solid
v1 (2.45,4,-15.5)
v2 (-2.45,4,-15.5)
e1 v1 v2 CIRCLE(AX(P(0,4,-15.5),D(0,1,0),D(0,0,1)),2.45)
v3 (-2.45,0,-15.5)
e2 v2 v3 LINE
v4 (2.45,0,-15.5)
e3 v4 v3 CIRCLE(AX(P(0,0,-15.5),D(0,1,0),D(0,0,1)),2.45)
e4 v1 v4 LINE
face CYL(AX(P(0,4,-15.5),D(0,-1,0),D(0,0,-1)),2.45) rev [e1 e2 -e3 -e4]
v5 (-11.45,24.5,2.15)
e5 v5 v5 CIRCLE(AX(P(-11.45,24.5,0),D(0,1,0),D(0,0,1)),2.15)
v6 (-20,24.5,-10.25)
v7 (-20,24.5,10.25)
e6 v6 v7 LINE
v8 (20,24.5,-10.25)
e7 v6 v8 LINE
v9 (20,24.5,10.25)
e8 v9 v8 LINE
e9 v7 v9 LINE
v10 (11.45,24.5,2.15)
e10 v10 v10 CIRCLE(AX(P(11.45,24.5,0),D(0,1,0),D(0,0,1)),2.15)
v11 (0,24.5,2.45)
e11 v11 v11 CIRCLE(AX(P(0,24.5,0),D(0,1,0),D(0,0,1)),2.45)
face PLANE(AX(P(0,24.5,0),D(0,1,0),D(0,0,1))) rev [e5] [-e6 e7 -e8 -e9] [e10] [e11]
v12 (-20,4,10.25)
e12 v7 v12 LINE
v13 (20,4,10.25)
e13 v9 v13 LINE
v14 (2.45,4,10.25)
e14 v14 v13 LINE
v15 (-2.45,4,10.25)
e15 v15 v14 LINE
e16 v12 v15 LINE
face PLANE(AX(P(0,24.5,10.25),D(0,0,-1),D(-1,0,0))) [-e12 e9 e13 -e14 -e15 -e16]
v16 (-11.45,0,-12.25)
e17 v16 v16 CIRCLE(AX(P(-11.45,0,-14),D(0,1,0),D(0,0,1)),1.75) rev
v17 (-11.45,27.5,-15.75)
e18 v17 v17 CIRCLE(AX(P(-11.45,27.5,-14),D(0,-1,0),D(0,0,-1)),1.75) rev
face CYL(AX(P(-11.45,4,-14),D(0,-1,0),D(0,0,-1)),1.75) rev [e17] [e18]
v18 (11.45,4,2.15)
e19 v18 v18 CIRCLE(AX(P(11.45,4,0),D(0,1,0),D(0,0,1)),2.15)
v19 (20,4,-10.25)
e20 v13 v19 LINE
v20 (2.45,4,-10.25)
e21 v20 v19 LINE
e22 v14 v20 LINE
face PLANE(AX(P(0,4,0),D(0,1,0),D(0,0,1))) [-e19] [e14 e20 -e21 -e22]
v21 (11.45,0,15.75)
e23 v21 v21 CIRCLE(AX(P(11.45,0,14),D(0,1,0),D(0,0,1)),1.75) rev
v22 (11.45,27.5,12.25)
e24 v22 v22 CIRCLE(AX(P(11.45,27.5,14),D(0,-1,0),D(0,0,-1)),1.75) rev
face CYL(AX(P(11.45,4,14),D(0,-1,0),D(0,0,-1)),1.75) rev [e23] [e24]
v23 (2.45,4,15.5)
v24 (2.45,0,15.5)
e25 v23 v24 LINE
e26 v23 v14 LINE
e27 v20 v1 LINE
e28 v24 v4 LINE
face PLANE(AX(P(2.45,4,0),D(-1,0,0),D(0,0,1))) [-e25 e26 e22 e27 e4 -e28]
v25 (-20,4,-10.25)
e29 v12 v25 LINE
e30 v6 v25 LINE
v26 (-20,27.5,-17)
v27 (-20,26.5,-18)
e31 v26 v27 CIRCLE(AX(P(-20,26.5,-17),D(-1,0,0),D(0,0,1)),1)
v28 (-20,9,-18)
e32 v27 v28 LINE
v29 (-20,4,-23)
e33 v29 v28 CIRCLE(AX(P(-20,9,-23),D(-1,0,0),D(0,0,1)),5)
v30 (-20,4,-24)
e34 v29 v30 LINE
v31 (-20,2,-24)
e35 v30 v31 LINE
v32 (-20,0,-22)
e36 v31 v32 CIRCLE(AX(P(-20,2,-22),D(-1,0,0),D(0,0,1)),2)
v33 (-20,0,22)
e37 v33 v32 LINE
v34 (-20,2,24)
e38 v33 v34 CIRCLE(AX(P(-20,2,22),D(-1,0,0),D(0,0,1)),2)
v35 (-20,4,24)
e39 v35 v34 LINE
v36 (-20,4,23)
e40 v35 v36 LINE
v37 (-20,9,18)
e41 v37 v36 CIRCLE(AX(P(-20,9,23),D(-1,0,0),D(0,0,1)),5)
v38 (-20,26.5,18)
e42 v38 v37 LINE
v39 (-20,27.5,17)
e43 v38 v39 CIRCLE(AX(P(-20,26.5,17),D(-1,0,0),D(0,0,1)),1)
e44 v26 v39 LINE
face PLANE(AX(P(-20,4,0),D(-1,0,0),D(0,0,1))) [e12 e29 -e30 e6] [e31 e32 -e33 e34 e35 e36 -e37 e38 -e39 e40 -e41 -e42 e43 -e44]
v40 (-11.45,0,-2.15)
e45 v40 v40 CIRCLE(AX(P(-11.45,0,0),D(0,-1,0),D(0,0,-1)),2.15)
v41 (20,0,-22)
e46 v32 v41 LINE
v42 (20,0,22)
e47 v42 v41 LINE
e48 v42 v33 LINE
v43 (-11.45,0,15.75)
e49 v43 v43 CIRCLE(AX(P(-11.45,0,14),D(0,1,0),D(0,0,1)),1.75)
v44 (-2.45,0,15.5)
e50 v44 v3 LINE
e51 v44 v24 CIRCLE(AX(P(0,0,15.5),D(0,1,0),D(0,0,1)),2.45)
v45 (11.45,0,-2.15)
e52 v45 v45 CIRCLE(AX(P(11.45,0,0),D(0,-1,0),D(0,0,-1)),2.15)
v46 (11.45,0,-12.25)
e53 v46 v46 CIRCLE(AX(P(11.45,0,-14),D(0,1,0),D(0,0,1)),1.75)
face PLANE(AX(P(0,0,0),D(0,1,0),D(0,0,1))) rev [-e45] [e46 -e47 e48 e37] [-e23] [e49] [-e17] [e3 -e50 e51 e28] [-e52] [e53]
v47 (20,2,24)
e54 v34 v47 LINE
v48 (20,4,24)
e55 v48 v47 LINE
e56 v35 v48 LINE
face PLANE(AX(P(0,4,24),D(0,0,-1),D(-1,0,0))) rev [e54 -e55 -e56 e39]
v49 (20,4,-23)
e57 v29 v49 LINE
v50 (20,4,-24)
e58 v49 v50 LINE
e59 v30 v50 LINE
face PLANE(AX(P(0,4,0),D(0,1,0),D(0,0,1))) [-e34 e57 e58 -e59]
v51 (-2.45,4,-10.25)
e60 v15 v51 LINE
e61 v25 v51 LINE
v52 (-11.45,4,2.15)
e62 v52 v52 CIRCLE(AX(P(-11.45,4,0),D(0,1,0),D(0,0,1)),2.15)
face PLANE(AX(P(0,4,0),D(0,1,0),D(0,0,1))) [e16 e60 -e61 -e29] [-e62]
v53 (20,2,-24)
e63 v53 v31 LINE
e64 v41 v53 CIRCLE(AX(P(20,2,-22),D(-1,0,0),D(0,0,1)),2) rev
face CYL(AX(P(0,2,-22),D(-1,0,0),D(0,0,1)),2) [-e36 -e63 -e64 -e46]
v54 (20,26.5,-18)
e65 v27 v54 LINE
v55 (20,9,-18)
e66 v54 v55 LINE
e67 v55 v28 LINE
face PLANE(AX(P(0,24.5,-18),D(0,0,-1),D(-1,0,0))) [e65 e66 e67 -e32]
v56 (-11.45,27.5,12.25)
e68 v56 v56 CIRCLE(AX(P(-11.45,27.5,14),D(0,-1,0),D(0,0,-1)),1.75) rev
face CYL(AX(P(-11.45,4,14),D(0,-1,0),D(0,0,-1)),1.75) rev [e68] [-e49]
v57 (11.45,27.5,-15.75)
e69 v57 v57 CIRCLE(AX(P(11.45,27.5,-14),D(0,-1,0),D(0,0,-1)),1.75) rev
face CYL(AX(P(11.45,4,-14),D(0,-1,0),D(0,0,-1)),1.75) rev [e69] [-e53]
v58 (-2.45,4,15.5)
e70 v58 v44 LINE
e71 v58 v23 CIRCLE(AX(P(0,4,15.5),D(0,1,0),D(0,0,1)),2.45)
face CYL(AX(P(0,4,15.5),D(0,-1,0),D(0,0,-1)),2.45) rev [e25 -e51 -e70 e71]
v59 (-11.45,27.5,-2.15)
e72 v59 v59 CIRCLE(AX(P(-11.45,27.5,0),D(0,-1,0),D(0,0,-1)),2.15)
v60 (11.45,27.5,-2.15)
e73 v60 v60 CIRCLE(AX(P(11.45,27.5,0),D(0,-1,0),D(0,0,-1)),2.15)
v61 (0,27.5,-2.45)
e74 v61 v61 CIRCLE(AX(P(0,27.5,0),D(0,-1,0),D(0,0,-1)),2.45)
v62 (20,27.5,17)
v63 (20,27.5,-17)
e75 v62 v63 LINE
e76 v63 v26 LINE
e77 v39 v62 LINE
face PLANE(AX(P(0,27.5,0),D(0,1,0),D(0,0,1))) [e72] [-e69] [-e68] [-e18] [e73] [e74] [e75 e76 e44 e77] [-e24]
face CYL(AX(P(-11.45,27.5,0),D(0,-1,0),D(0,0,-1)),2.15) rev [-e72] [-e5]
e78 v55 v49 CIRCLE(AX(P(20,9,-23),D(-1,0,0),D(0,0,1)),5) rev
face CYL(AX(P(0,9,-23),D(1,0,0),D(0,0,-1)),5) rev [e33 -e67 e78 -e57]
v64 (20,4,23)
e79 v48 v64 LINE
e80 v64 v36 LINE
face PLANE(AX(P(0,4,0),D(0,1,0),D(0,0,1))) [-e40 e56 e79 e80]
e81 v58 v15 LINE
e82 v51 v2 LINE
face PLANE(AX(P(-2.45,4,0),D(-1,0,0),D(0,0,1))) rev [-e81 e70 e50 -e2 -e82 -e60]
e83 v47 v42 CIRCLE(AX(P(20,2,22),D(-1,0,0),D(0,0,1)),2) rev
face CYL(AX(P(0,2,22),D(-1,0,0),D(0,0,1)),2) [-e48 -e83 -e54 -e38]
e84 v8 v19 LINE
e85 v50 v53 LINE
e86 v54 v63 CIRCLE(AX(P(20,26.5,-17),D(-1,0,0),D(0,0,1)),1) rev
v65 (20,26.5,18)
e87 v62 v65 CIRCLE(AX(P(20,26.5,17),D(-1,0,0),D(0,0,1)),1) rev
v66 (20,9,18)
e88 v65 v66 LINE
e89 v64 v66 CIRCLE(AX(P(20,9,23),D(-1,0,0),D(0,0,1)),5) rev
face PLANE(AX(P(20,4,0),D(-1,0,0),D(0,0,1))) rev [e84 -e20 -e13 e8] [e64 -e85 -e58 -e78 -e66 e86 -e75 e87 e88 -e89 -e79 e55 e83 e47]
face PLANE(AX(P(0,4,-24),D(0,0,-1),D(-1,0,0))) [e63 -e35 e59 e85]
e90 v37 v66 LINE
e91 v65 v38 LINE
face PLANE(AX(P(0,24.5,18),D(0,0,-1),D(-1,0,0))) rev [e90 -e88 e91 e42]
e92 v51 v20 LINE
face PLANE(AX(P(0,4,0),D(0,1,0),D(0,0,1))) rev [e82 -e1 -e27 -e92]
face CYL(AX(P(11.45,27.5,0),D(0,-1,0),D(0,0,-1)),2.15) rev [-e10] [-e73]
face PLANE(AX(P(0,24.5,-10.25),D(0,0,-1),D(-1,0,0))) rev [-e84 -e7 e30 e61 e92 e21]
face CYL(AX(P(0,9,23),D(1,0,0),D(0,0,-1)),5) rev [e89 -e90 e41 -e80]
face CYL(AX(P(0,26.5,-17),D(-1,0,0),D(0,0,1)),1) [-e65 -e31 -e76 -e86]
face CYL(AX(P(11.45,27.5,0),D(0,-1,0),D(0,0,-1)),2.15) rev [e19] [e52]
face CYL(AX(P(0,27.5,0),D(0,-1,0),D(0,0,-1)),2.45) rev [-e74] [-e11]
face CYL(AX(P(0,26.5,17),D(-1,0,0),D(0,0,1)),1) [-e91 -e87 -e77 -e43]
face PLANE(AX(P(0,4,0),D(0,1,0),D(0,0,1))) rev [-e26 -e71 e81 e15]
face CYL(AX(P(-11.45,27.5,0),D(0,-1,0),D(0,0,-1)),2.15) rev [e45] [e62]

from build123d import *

# Parameters (mm, degrees)
SKETCH_1_W                = 40
SKETCH_1_H                = 48
SKETCH_1_R                = 1.75
EXTRUDE_1_DEPTH           = 4
SKETCH_2_W                = 40
SKETCH_2_H                = 7.75
EXTRUDE_5_DEPTH           = 20.5
SKETCH_4_W                = 40
SKETCH_4_H                = 36
EXTRUDE_6_DEPTH           = 3
FILLET_4_R                = 5
FILLET_5_R                = 5
FILLET_7_R                = 2
FILLET_8_R                = 2
CUT_EXTRUDE_START         = -27.5
CUT_EXTRUDE_1_OUTLINE_R   = 1.75
CUT_EXTRUDE_1_OUTLINE_R_2 = 2.15
CUT_EXTRUDE_1_DEPTH       = 27.5
FILLET_9_R                = 1
FILLET_10_R               = 1
SKETCH_6_R                = 2.45
CUT_EXTRUDE_2_DEPTH       = 42.620307543


# Read off the part's stored shape, not the designer's step: 切除-拉伸1
with BuildPart() as part:
    # 草图1 → 凸台-拉伸1 (new body)
    with BuildSketch(Plane(origin=(0, 0, 0), x_dir=(1, 0, 0), z_dir=(0, 1, 0))):
        Rectangle(SKETCH_1_W, SKETCH_1_H)
        with Locations(Location((11.45, 14, 0), (0, 0, 270))):
            Circle(SKETCH_1_R, mode=Mode.SUBTRACT)
        with Locations(Location((-11.45, 14, 0), (0, 0, 270))):
            Circle(SKETCH_1_R, mode=Mode.SUBTRACT)
        with Locations(Location((-11.45, -14, 0), (0, 0, 270))):
            Circle(SKETCH_1_R, mode=Mode.SUBTRACT)
        with Locations(Location((11.45, -14, 0), (0, 0, 270))):
            Circle(SKETCH_1_R, mode=Mode.SUBTRACT)
        with BuildLine():
            Line((-2.45, -15.5), (-2.45, 15.5))
            ThreePointArc((-2.45, 15.5), (0, 17.95), (2.45, 15.5))
            Line((2.45, 15.5), (2.45, -15.5))
            ThreePointArc((2.45, -15.5), (0, -17.95), (-2.45, -15.5))
        make_face(mode=Mode.SUBTRACT)
    extrude(amount=EXTRUDE_1_DEPTH)

    # 草图2 → 凸台-拉伸5 (add)
    with BuildSketch(Plane(origin=(0, 4, 0), x_dir=(1, 0, 0), z_dir=(0, 1, 0))):
        with Locations((0, -14.125)):
            Rectangle(SKETCH_2_W, SKETCH_2_H)
        with Locations((0, 14.125)):
            Rectangle(SKETCH_2_W, SKETCH_2_H)
    extrude(amount=EXTRUDE_5_DEPTH)

    # 草图4 → 凸台-拉伸6 (add)
    with BuildSketch(Plane(origin=(0, 24.5, 0), x_dir=(1, 0, 0), z_dir=(0, 1, 0))):
        Rectangle(SKETCH_4_W, SKETCH_4_H)
    extrude(amount=EXTRUDE_6_DEPTH)

    # 圆角4
    fillet_4_edges = [part.edges().sort_by_distance(p)[0] for p in [
        (0, 4, -18),
    ]]
    fillet(fillet_4_edges, radius=FILLET_4_R)

    # 圆角5
    fillet_5_edges = [part.edges().sort_by_distance(p)[0] for p in [
        (0, 4, 18),
    ]]
    fillet(fillet_5_edges, radius=FILLET_5_R)

    # 圆角7
    fillet_7_edges = [part.edges().sort_by_distance(p)[0] for p in [
        (0, 0, 24),
    ]]
    fillet(fillet_7_edges, radius=FILLET_7_R)

    # 圆角8
    fillet_8_edges = [part.edges().sort_by_distance(p)[0] for p in [
        (0, 0, -24),
    ]]
    fillet(fillet_8_edges, radius=FILLET_8_R)

    # 切除-拉伸1 outline → 切除-拉伸1 (cut)
    with BuildSketch(Plane.XZ.offset(CUT_EXTRUDE_START)):
        with Locations((-11.45, 14)):
            Circle(CUT_EXTRUDE_1_OUTLINE_R)
        with Locations((-11.45, -14)):
            Circle(CUT_EXTRUDE_1_OUTLINE_R)
        with Locations((11.45, -14)):
            Circle(CUT_EXTRUDE_1_OUTLINE_R)
        with Locations((11.45, 14)):
            Circle(CUT_EXTRUDE_1_OUTLINE_R)
        with Locations((-11.45, 0)):
            Circle(CUT_EXTRUDE_1_OUTLINE_R_2)
        with Locations((11.45, 0)):
            Circle(CUT_EXTRUDE_1_OUTLINE_R_2)
    extrude(amount=CUT_EXTRUDE_1_DEPTH, mode=Mode.SUBTRACT)

    # 圆角9
    fillet_9_edges = [part.edges().sort_by_distance(p)[0] for p in [
        (0, 27.5, 18),
    ]]
    fillet(fillet_9_edges, radius=FILLET_9_R)

    # 圆角10
    fillet_10_edges = [part.edges().sort_by_distance(p)[0] for p in [
        (0, 27.5, -18),
    ]]
    fillet(fillet_10_edges, radius=FILLET_10_R)

    # 草图6 → 切除-拉伸2 (cut, through all)
    with BuildSketch(Plane.XZ):
        with Locations(Location((0, 0, 0), (0, 0, 270))):
            Circle(SKETCH_6_R)
    extrude(amount=-CUT_EXTRUDE_2_DEPTH, mode=Mode.SUBTRACT)


solid = part.part
